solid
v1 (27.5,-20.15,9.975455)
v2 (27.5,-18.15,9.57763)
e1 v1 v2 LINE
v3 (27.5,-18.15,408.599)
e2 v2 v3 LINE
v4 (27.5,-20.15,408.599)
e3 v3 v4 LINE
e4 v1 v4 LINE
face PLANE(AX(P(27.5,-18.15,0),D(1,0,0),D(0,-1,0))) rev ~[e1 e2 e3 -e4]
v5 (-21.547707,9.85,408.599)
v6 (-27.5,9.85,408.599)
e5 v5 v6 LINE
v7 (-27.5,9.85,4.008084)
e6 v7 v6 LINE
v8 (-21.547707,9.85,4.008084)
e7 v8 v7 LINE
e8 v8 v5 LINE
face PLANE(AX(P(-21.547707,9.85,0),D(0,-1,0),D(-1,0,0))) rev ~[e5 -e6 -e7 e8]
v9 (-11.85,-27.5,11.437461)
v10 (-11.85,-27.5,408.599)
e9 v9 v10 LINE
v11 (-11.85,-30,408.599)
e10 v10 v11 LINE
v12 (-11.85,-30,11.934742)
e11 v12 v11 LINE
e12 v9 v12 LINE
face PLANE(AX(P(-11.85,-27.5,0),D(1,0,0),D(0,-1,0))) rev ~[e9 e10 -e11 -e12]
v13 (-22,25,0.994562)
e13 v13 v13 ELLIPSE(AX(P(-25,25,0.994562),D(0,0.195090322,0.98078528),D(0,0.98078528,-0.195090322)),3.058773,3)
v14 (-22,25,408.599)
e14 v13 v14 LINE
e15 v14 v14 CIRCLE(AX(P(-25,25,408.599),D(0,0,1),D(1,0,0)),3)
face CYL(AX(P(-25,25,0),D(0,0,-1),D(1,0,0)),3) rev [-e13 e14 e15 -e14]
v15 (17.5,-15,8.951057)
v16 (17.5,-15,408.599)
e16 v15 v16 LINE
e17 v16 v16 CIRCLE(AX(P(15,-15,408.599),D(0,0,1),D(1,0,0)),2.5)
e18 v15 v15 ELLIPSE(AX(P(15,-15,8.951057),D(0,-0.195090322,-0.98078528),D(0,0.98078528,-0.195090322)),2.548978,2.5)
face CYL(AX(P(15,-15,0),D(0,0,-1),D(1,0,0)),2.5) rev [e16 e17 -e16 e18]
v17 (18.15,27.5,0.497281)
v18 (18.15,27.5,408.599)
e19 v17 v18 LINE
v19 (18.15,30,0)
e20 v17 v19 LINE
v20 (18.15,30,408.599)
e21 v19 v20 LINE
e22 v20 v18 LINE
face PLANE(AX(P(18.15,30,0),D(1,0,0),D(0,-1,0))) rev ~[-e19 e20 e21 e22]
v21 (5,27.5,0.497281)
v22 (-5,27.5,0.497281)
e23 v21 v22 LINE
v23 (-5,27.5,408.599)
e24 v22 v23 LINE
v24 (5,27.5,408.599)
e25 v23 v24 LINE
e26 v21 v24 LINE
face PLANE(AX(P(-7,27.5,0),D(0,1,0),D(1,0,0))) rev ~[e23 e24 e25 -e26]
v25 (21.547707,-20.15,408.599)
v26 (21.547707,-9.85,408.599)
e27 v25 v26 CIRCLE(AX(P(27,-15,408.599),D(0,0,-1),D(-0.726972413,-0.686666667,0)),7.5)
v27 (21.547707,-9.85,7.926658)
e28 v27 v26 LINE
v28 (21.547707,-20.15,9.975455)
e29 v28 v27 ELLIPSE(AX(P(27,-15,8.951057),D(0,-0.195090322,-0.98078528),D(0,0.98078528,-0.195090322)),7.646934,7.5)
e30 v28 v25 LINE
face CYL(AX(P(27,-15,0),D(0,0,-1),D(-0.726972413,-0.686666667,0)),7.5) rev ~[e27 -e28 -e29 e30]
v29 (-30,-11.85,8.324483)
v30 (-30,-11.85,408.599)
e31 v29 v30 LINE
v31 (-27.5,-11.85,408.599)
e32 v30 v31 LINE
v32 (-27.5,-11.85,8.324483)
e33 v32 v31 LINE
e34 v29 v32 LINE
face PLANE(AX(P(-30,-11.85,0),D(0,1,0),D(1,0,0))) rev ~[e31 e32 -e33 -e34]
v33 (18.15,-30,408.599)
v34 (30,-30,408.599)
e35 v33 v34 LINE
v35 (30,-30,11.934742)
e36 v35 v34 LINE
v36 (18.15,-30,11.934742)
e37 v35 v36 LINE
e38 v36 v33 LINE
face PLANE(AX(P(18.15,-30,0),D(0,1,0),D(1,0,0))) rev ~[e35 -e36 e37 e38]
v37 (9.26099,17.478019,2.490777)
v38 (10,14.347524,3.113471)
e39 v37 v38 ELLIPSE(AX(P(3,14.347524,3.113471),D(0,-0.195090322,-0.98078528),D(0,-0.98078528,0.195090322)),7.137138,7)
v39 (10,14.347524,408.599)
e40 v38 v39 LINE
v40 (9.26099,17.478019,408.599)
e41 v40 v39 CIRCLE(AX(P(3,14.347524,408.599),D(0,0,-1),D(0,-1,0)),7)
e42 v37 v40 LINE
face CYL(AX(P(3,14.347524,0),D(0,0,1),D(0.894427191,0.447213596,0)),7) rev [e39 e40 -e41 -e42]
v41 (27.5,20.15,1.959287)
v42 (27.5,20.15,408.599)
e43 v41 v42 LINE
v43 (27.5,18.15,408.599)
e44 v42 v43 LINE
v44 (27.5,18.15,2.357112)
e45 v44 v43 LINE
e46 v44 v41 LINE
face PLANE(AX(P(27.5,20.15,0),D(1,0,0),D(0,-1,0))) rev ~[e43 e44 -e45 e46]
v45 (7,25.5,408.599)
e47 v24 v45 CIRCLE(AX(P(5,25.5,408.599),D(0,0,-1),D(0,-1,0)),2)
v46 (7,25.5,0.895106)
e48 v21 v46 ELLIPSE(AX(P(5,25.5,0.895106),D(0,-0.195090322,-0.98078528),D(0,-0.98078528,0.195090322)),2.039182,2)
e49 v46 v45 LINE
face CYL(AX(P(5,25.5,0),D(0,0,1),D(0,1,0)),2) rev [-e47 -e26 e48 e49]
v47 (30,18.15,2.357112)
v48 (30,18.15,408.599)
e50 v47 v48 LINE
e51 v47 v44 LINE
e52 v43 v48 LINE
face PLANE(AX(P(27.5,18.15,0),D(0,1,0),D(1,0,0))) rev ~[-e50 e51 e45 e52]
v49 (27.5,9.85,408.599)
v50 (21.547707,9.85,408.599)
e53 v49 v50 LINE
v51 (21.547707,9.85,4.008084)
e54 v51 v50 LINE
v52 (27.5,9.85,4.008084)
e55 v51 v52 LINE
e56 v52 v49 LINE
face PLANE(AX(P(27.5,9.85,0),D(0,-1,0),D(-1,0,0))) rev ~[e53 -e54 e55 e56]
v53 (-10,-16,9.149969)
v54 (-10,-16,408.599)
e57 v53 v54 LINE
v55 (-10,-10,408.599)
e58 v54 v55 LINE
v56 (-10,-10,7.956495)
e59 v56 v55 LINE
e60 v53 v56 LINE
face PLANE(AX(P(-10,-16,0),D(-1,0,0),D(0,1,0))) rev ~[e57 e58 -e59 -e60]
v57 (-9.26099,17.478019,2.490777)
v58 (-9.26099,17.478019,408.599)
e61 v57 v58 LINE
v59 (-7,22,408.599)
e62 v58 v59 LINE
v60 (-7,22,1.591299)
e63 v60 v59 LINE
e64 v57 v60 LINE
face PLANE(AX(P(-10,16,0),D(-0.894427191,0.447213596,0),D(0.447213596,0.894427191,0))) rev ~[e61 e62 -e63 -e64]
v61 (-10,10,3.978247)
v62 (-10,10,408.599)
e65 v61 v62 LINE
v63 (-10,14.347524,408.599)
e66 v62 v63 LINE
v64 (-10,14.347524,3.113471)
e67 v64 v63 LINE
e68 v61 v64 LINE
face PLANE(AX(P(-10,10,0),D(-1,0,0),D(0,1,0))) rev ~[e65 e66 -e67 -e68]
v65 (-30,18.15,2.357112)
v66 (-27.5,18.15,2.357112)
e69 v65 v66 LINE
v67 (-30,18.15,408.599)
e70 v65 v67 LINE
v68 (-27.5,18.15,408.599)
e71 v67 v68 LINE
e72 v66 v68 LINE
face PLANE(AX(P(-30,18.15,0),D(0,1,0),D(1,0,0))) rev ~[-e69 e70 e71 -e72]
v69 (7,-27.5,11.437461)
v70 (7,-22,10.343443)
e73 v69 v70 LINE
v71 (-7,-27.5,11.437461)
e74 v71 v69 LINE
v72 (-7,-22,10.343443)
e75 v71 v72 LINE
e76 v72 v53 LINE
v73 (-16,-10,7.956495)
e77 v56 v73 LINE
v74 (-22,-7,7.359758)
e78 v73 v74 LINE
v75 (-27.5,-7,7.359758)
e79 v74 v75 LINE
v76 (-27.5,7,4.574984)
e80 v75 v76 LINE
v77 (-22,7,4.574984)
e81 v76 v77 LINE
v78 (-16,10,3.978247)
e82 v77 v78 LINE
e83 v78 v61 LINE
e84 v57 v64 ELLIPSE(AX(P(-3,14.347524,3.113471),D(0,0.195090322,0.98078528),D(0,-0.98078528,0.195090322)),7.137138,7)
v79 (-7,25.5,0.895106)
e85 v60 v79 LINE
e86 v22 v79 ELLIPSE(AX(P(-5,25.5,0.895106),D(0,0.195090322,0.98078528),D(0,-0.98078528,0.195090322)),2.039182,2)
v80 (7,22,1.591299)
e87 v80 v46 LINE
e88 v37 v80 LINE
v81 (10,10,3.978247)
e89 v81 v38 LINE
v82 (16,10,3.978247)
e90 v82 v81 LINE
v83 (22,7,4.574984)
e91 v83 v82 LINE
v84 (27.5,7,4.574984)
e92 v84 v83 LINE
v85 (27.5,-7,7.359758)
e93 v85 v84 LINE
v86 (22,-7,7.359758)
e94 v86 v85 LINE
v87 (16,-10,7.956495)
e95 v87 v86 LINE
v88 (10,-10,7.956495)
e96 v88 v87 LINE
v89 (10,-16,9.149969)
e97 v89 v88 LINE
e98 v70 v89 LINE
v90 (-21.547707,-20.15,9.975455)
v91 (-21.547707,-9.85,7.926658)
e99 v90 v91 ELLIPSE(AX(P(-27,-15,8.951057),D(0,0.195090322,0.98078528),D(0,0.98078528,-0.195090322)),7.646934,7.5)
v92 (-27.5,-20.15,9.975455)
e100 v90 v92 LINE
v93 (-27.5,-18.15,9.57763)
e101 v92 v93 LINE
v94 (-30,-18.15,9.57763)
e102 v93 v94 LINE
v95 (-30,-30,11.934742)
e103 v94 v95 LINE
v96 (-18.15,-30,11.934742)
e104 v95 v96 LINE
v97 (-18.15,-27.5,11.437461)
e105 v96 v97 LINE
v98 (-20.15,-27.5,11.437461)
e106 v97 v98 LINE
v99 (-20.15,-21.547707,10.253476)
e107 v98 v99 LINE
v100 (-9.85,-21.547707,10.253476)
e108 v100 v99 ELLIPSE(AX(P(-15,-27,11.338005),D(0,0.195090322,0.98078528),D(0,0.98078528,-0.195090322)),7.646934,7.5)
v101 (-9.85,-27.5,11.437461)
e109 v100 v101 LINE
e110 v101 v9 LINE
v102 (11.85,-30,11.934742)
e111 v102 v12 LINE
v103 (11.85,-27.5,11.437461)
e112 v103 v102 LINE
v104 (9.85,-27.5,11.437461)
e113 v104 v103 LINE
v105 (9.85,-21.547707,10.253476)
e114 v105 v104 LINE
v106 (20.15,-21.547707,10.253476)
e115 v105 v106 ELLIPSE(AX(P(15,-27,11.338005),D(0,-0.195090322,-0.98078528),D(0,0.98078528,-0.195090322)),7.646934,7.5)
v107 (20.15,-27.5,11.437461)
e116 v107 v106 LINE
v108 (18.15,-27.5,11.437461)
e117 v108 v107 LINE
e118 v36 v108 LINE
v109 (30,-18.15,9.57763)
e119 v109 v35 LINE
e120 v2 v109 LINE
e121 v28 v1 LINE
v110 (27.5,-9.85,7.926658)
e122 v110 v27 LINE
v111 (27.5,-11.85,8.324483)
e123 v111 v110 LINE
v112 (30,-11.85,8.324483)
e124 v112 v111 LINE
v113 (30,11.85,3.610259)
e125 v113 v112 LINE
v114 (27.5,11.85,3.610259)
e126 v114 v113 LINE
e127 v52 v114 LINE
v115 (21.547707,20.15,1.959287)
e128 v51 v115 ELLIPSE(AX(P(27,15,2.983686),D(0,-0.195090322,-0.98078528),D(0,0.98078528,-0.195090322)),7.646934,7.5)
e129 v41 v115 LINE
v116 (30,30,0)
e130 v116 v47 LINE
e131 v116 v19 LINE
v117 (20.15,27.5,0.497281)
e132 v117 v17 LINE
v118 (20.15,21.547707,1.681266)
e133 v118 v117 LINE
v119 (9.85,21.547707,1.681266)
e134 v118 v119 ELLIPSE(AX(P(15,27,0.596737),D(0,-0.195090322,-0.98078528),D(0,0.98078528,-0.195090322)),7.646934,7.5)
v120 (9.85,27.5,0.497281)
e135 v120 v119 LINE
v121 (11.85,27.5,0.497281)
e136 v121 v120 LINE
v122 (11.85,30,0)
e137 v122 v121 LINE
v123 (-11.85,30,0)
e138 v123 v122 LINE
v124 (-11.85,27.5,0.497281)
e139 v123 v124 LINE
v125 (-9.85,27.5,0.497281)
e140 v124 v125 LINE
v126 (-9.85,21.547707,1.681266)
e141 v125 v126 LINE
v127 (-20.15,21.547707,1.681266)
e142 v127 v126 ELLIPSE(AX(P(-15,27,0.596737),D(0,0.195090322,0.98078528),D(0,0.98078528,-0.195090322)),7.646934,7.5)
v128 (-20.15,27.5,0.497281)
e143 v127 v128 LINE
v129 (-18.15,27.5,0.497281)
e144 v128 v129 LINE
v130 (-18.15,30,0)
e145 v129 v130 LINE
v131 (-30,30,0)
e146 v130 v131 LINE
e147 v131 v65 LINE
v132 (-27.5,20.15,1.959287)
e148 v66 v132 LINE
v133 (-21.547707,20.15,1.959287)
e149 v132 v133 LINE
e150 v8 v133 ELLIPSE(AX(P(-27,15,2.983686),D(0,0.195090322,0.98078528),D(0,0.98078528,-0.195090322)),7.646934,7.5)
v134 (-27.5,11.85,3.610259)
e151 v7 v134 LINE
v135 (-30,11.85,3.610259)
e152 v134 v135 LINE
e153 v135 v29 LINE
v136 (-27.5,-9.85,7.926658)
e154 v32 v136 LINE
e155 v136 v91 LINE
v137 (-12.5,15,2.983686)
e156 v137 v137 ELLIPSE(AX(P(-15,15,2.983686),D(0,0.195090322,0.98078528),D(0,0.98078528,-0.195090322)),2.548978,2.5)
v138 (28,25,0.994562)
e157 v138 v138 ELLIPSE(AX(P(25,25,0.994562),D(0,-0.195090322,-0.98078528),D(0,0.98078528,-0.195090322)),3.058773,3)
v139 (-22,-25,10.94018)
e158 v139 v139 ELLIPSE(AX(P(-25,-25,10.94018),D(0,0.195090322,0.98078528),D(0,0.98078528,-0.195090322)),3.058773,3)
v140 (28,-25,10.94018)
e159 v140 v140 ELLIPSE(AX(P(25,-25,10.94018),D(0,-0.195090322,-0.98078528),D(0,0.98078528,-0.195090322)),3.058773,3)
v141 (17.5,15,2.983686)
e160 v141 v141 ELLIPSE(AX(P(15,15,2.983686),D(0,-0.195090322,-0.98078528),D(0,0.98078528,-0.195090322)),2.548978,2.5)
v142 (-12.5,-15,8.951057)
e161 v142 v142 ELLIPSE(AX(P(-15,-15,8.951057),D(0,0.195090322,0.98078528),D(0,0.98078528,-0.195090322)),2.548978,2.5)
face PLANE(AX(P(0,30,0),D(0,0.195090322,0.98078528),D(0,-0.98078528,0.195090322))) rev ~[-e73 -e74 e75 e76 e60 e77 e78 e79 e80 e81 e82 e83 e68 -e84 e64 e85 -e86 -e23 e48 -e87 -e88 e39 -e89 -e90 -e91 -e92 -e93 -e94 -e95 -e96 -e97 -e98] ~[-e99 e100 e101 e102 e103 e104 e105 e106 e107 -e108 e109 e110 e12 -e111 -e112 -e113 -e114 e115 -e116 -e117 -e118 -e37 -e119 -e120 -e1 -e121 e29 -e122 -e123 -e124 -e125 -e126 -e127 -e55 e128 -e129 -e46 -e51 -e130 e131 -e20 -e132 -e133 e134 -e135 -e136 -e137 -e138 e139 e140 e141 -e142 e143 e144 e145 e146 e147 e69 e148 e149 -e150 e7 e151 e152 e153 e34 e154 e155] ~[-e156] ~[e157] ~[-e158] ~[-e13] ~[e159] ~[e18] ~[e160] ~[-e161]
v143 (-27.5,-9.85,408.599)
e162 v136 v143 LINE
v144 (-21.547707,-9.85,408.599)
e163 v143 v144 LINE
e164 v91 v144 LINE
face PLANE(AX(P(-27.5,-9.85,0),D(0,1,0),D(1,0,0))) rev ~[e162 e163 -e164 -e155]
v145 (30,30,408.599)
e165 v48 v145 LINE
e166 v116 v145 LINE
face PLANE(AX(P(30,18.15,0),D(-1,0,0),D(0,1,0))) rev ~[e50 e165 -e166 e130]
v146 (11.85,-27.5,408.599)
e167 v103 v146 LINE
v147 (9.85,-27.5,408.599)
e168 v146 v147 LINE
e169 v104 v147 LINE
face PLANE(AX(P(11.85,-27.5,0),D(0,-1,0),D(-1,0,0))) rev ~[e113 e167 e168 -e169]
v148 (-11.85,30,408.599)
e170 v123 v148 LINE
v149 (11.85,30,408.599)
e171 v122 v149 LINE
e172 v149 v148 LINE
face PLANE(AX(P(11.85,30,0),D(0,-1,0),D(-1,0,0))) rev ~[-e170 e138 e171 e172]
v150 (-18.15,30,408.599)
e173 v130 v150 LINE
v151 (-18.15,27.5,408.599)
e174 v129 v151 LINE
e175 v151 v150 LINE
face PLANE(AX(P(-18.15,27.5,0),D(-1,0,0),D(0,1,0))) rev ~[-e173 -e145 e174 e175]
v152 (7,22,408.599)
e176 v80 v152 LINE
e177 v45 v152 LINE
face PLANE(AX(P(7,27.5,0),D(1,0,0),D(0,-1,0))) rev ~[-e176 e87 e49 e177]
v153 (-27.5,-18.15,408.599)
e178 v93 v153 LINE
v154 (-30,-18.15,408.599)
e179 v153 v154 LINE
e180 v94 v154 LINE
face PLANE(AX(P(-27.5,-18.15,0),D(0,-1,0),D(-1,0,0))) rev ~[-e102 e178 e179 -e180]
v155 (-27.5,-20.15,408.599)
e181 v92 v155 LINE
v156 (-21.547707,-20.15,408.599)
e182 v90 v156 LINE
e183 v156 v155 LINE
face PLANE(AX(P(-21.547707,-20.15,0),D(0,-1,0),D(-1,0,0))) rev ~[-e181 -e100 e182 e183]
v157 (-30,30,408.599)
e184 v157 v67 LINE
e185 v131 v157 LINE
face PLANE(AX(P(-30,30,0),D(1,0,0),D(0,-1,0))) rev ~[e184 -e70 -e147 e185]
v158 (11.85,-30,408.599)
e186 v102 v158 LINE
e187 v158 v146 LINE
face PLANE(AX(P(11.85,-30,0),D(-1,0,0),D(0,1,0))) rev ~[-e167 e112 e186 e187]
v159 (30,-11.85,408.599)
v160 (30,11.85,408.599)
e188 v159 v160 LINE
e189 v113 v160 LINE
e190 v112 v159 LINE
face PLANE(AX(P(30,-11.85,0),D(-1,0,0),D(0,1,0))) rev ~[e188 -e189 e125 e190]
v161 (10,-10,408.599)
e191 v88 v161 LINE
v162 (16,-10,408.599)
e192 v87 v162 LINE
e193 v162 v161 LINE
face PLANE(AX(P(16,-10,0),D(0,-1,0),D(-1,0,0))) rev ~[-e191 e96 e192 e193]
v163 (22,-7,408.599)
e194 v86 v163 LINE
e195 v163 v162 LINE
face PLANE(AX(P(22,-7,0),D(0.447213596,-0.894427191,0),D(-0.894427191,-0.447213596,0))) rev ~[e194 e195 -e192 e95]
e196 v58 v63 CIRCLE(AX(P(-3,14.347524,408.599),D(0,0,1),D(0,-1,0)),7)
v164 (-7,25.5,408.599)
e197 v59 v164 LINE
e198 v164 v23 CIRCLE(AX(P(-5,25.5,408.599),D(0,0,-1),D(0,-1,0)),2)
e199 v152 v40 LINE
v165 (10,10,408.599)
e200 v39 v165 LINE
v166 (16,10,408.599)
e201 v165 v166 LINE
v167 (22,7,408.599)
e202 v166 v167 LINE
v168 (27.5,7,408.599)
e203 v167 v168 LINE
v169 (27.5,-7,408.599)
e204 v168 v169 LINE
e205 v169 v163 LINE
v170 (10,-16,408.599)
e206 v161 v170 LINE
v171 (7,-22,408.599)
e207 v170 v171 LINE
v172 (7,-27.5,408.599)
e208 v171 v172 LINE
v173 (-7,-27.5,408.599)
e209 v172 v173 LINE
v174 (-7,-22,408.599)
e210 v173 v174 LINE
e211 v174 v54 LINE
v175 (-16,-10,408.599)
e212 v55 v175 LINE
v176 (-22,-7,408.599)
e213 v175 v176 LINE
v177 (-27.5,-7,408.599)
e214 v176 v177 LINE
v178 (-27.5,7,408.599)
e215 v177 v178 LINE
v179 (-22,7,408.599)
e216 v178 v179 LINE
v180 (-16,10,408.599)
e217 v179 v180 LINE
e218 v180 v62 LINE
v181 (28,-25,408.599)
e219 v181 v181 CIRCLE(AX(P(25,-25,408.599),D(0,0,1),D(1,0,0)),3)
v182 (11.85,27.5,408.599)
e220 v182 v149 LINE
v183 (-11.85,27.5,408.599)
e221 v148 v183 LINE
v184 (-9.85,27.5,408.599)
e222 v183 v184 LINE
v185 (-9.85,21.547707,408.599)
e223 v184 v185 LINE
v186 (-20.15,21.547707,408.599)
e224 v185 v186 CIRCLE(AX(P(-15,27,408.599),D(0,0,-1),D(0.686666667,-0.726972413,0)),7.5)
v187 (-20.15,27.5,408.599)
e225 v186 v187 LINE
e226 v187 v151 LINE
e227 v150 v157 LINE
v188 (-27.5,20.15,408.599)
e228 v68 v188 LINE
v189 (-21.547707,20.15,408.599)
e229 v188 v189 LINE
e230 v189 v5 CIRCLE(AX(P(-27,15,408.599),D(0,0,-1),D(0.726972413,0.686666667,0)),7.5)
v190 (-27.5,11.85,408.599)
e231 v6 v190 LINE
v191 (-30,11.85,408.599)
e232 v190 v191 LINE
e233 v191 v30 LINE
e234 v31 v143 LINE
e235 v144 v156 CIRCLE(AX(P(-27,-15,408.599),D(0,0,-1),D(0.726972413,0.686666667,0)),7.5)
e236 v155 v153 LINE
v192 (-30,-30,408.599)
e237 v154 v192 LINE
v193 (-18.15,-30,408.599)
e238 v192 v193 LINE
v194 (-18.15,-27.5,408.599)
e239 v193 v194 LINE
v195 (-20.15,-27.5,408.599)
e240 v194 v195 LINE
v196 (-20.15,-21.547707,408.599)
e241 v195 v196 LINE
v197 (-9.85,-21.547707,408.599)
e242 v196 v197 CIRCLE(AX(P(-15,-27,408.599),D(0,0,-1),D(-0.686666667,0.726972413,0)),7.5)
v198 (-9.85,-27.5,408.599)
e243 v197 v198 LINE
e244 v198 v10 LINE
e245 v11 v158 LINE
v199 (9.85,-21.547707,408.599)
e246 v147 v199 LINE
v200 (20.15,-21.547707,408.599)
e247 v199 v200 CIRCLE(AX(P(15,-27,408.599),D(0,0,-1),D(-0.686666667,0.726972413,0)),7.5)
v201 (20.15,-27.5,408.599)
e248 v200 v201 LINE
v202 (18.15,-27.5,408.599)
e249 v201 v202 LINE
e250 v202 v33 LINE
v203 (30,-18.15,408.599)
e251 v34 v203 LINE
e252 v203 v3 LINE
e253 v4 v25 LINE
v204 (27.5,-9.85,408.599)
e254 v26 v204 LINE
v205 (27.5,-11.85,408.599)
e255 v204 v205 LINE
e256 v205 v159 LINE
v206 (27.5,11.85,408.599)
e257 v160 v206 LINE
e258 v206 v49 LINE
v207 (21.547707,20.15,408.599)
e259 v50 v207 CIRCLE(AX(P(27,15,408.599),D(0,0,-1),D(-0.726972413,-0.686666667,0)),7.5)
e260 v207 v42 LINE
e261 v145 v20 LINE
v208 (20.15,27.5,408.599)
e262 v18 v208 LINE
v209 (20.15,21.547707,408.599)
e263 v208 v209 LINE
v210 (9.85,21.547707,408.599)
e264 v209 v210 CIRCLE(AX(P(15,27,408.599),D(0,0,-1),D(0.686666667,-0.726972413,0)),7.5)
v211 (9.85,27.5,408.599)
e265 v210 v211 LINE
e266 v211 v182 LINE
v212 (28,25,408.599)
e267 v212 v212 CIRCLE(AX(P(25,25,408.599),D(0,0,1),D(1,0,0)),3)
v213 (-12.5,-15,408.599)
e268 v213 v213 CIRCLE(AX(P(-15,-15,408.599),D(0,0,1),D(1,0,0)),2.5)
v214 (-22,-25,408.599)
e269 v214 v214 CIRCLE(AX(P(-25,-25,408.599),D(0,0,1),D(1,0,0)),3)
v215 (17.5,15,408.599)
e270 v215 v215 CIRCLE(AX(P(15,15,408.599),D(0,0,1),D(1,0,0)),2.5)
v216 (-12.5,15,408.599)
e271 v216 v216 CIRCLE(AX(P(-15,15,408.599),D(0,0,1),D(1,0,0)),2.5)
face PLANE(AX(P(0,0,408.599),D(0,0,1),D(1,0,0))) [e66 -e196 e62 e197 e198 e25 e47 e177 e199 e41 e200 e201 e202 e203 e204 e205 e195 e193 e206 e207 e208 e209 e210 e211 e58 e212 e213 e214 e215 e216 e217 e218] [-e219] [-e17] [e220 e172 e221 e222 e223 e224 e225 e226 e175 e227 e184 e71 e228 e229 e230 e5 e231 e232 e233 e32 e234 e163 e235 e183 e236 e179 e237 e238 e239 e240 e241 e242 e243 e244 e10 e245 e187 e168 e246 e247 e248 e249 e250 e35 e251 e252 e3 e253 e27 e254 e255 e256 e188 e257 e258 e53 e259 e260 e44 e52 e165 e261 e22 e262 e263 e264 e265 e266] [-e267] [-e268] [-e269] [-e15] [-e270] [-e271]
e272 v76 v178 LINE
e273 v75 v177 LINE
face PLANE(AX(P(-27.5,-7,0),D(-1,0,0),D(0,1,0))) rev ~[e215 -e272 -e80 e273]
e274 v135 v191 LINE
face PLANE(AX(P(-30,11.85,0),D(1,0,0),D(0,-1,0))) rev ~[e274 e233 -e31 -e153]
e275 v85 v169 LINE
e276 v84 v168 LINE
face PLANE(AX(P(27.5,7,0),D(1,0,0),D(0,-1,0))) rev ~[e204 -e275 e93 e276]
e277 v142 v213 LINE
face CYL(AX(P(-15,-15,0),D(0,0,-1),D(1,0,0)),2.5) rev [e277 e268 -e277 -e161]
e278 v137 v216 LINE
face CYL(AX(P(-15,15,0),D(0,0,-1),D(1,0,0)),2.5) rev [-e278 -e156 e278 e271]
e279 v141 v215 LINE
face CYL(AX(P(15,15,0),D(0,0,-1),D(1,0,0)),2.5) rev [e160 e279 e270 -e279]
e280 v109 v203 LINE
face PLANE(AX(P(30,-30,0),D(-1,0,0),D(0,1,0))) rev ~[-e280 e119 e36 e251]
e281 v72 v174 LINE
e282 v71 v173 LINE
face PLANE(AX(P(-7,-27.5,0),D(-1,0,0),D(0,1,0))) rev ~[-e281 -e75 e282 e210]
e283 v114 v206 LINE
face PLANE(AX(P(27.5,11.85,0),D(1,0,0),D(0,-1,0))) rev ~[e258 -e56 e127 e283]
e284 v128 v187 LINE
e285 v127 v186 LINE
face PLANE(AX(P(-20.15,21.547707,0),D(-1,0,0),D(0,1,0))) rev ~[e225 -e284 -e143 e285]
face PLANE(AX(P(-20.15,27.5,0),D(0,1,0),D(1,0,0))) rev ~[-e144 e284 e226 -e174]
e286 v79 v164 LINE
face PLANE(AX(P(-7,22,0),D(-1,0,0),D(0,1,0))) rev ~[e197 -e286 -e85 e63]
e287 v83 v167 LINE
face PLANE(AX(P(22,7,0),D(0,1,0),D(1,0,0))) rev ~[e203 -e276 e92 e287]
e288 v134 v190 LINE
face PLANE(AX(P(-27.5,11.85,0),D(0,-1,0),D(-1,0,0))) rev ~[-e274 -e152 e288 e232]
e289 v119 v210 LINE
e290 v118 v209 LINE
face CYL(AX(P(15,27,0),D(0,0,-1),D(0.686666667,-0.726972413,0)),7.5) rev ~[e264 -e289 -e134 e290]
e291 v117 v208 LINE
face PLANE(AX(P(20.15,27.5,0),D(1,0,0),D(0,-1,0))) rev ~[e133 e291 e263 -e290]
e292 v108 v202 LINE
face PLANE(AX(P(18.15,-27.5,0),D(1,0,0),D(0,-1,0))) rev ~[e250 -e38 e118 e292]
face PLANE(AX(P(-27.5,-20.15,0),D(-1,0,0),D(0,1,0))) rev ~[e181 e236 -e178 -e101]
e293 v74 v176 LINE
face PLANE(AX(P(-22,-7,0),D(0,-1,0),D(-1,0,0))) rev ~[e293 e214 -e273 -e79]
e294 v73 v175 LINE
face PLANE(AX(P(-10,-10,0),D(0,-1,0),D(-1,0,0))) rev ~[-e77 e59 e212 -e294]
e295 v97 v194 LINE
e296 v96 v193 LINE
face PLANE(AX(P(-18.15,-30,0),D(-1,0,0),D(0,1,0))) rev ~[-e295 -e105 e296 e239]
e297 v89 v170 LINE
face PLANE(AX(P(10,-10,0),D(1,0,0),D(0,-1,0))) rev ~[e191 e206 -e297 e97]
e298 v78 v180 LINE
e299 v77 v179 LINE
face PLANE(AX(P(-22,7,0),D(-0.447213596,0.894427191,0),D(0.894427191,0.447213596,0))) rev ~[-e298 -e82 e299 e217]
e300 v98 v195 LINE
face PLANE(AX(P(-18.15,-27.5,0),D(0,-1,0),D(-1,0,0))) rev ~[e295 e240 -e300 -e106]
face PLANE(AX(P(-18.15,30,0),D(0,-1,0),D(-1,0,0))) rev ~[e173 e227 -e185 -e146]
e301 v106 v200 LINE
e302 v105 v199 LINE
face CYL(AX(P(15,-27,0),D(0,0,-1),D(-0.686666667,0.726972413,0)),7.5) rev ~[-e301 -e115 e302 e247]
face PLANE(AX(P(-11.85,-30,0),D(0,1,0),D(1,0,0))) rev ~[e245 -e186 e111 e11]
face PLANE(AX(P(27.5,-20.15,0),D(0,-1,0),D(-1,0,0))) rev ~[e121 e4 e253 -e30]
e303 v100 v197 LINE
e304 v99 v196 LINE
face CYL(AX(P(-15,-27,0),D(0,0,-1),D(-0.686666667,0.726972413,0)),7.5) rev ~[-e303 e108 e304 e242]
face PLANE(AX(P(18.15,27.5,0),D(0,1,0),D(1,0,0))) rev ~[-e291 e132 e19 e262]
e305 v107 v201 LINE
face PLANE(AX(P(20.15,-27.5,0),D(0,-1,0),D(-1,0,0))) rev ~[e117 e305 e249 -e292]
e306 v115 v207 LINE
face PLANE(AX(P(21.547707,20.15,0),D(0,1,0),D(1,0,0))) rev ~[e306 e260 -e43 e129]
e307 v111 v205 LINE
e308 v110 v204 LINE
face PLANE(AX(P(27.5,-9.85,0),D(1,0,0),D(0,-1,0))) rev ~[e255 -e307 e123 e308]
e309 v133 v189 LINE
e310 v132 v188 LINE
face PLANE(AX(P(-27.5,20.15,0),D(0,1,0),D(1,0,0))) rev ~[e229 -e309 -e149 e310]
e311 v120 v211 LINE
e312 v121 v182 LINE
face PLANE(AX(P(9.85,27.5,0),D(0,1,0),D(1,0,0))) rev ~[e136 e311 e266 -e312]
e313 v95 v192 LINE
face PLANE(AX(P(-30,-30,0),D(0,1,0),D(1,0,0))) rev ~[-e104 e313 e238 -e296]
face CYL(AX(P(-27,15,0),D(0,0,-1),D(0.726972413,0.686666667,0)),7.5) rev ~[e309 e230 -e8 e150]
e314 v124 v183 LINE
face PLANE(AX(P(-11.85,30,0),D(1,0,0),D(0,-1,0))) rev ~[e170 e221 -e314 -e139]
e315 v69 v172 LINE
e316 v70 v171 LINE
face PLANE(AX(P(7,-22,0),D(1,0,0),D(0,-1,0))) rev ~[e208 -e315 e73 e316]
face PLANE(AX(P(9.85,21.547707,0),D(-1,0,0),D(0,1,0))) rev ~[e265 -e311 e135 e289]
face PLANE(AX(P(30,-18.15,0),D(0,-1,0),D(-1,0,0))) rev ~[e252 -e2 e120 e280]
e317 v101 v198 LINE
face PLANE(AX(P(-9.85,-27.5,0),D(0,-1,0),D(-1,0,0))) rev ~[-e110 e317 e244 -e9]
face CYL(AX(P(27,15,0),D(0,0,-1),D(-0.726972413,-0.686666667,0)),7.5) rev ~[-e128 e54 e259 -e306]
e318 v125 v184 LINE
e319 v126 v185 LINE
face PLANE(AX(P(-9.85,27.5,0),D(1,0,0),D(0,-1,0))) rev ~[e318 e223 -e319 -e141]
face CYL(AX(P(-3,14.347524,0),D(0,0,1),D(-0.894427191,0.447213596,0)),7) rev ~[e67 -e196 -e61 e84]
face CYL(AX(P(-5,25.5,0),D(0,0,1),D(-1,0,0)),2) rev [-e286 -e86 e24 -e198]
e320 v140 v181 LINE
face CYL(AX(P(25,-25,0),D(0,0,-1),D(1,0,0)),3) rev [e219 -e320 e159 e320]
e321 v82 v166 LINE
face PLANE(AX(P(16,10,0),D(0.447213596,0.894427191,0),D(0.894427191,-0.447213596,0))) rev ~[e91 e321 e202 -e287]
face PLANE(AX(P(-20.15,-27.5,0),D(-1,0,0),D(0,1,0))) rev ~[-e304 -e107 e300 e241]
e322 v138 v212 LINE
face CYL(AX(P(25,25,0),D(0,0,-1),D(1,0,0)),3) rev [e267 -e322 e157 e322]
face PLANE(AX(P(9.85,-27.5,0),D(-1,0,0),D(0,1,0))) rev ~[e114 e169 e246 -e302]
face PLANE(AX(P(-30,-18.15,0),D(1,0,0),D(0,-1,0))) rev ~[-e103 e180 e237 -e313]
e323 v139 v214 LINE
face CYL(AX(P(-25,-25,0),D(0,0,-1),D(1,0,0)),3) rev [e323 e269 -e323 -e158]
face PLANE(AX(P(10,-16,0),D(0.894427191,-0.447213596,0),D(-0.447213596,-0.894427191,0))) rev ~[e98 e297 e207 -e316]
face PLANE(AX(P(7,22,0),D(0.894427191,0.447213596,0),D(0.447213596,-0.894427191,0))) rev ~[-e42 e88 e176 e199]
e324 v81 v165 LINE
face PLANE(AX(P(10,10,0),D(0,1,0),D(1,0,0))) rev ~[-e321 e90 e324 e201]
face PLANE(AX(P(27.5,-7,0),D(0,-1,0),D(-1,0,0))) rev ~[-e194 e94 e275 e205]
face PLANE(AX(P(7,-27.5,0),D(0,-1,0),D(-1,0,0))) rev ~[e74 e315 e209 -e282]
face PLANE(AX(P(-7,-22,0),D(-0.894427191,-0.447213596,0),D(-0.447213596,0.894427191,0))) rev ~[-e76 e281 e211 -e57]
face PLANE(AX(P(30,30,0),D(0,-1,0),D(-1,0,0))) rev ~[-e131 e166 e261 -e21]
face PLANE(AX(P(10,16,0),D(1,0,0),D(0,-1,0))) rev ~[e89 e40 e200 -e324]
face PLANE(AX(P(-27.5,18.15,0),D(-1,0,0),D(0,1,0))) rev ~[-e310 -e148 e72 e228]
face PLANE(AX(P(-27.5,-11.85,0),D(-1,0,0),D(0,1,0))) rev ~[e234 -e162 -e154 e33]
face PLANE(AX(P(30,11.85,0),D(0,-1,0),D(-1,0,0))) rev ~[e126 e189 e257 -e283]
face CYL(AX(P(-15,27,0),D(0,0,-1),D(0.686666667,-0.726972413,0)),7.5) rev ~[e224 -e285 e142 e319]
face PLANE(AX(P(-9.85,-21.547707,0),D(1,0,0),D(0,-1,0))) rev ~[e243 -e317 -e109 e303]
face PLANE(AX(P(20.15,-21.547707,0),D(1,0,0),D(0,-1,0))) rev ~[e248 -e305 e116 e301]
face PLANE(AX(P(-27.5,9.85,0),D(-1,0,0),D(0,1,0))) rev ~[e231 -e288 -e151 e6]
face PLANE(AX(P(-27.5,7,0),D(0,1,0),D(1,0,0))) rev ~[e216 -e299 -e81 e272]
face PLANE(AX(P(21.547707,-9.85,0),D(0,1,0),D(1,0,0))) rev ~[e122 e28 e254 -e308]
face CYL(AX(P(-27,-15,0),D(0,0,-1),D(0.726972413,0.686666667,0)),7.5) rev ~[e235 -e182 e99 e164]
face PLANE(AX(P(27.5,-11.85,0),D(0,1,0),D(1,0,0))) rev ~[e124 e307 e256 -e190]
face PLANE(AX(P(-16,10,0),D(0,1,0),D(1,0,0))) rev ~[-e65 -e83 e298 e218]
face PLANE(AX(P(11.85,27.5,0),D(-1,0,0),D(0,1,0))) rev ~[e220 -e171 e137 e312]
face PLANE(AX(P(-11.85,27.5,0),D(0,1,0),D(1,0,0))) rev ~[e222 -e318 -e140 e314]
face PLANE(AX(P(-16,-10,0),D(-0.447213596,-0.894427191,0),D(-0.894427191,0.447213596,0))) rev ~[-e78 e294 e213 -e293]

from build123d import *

# Parameters (mm, degrees)
F0_R          = 3
F0_R_2        = 2.5
F1_DEPTH      = 408.599
F2_R          = 2
F3_R          = 7
F5_DEPTH      = 30
F5_DEPTH_BACK = 30


# Not quite as in the source:
# - a feature names something its author has since deleted; it is built from what else it names


with BuildPart() as f1:
    # F0 (on Top) → F1 (new body)
    with BuildSketch(Plane.XY):
        with BuildLine():
            Line((18.15, -30), (30, -30))
            Line((30, -30), (30, -18.15))
            Line((30, -18.15), (27.5, -18.15))
            Line((27.5, -18.15), (27.5, -20.15))
            Line((27.5, -20.15), (21.5477069044, -20.15))
            ThreePointArc((21.5477069044, -20.15), (19.5, -15), (21.5477069044, -9.85))
            Line((21.5477069044, -9.85), (27.5, -9.85))
            Line((27.5, -9.85), (27.5, -11.85))
            Line((27.5, -11.85), (30, -11.85))
            Line((30, -11.85), (30, 11.85))
            Line((30, 11.85), (27.5, 11.85))
            Line((27.5, 11.85), (27.5, 9.85))
            Line((27.5, 9.85), (21.5477069044, 9.85))
            ThreePointArc((21.5477069044, 9.85), (19.5, 15), (21.5477069044, 20.15))
            Line((21.5477069044, 20.15), (27.5, 20.15))
            Line((27.5, 20.15), (27.5, 18.15))
            Line((27.5, 18.15), (30, 18.15))
            Line((30, 18.15), (30, 30))
            Line((30, 30), (18.15, 30))
            Line((18.15, 30), (18.15, 27.5))
            Line((18.15, 27.5), (20.15, 27.5))
            Line((20.15, 27.5), (20.15, 21.5477069044))
            ThreePointArc((20.15, 21.5477069044), (15, 19.5), (9.85, 21.5477069044))
            Line((9.85, 21.5477069044), (9.85, 27.5))
            Line((9.85, 27.5), (11.85, 27.5))
            Line((11.85, 27.5), (11.85, 30))
            Line((11.85, 30), (-11.85, 30))
            Line((-11.85, 30), (-11.85, 27.5))
            Line((-11.85, 27.5), (-9.85, 27.5))
            Line((-9.85, 27.5), (-9.85, 21.5477069044))
            ThreePointArc((-9.85, 21.5477069044), (-15, 19.5), (-20.15, 21.5477069044))
            Line((-20.15, 21.5477069044), (-20.15, 27.5))
            Line((-20.15, 27.5), (-18.15, 27.5))
            Line((-18.15, 27.5), (-18.15, 30))
            Line((-18.15, 30), (-30, 30))
            Line((-30, 30), (-30, 18.15))
            Line((-30, 18.15), (-27.5, 18.15))
            Line((-27.5, 18.15), (-27.5, 20.15))
            Line((-27.5, 20.15), (-21.5477069044, 20.15))
            ThreePointArc((-21.5477069044, 20.15), (-19.5, 15), (-21.5477069044, 9.85))
            Line((-21.5477069044, 9.85), (-27.5, 9.85))
            Line((-27.5, 9.85), (-27.5, 11.85))
            Line((-27.5, 11.85), (-30, 11.85))
            Line((-30, 11.85), (-30, -11.85))
            Line((-30, -11.85), (-27.5, -11.85))
            Line((-27.5, -11.85), (-27.5, -9.85))
            Line((-27.5, -9.85), (-21.5477069044, -9.85))
            ThreePointArc((-21.5477069044, -9.85), (-19.5, -15), (-21.5477069044, -20.15))
            Line((-21.5477069044, -20.15), (-27.5, -20.15))
            Line((-27.5, -20.15), (-27.5, -18.15))
            Line((-27.5, -18.15), (-30, -18.15))
            Line((-30, -18.15), (-30, -30))
            Line((-30, -30), (-18.15, -30))
            Line((-18.15, -30), (-18.15, -27.5))
            Line((-18.15, -27.5), (-20.15, -27.5))
            Line((-20.15, -27.5), (-20.15, -21.5477069044))
            ThreePointArc((-20.15, -21.5477069044), (-15, -19.5), (-9.85, -21.5477069044))
            Line((-9.85, -21.5477069044), (-9.85, -27.5))
            Line((-9.85, -27.5), (-11.85, -27.5))
            Line((-11.85, -27.5), (-11.85, -30))
            Line((-11.85, -30), (11.85, -30))
            Line((11.85, -30), (11.85, -27.5))
            Line((11.85, -27.5), (9.85, -27.5))
            Line((9.85, -27.5), (9.85, -21.5477069044))
            ThreePointArc((9.85, -21.5477069044), (15, -19.5), (20.15, -21.5477069044))
            Line((20.15, -21.5477069044), (20.15, -27.5))
            Line((20.15, -27.5), (18.15, -27.5))
            Line((18.15, -27.5), (18.15, -30))
        make_face()
        with Locations((-25, -25)):
            Circle(F0_R, mode=Mode.SUBTRACT)
        with Locations((-15, -15)):
            Circle(F0_R_2, mode=Mode.SUBTRACT)
        with Locations((25, -25)):
            Circle(F0_R, mode=Mode.SUBTRACT)
        with Locations((15, -15)):
            Circle(F0_R_2, mode=Mode.SUBTRACT)
        with Locations((-25, 25)):
            Circle(F0_R, mode=Mode.SUBTRACT)
        with Locations((-15, 15)):
            Circle(F0_R_2, mode=Mode.SUBTRACT)
        Polygon((-7, 22), (-7, 27.5), (0, 27.5), (7, 27.5), (7, 22), (10, 16), (10, 10), (16, 10), (22, 7), (27.5, 7), (27.5, 0), (27.5, -7), (22, -7), (16, -10), (10, -10), (10, -16), (7, -22), (7, -27.5), (0, -27.5), (-7, -27.5), (-7, -22), (-10, -16), (-10, -10), (-16, -10), (-22, -7), (-27.5, -7), (-27.5, 0), (-27.5, 7), (-22, 7), (-16, 10), (-10, 10), (-10, 16), align=None, mode=Mode.SUBTRACT)
        with Locations((15, 15)):
            Circle(F0_R_2, mode=Mode.SUBTRACT)
        with Locations((25, 25)):
            Circle(F0_R, mode=Mode.SUBTRACT)
    extrude(amount=F1_DEPTH)

    # F2
    f2_edges = [f1.edges().sort_by_distance(p)[0] for p in [
        (-7, 27.5, 204.2995),
        (7, 27.5, 204.2995),
    ]]
    fillet(f2_edges, radius=F2_R)

    # F3
    f3_edges = [f1.edges().sort_by_distance(p)[0] for p in [
        (-10, 16, 204.2995),
        (10, 16, 204.2995),
    ]]
    fillet(f3_edges, radius=F3_R)

    # F4 (on Right) → F5 (cut, two sides)
    with BuildSketch(Plane.YZ) as f5_sk:
        Polygon((-164.2855995683, 38.6458085579), (-188.5911429791, -83.5464097089), (5.6944565892, -122.1922182668), (30, 0), align=None)
    extrude(amount=F5_DEPTH, mode=Mode.SUBTRACT)
    extrude(f5_sk.sketch, amount=-F5_DEPTH_BACK, mode=Mode.SUBTRACT)


solid = f1.part
